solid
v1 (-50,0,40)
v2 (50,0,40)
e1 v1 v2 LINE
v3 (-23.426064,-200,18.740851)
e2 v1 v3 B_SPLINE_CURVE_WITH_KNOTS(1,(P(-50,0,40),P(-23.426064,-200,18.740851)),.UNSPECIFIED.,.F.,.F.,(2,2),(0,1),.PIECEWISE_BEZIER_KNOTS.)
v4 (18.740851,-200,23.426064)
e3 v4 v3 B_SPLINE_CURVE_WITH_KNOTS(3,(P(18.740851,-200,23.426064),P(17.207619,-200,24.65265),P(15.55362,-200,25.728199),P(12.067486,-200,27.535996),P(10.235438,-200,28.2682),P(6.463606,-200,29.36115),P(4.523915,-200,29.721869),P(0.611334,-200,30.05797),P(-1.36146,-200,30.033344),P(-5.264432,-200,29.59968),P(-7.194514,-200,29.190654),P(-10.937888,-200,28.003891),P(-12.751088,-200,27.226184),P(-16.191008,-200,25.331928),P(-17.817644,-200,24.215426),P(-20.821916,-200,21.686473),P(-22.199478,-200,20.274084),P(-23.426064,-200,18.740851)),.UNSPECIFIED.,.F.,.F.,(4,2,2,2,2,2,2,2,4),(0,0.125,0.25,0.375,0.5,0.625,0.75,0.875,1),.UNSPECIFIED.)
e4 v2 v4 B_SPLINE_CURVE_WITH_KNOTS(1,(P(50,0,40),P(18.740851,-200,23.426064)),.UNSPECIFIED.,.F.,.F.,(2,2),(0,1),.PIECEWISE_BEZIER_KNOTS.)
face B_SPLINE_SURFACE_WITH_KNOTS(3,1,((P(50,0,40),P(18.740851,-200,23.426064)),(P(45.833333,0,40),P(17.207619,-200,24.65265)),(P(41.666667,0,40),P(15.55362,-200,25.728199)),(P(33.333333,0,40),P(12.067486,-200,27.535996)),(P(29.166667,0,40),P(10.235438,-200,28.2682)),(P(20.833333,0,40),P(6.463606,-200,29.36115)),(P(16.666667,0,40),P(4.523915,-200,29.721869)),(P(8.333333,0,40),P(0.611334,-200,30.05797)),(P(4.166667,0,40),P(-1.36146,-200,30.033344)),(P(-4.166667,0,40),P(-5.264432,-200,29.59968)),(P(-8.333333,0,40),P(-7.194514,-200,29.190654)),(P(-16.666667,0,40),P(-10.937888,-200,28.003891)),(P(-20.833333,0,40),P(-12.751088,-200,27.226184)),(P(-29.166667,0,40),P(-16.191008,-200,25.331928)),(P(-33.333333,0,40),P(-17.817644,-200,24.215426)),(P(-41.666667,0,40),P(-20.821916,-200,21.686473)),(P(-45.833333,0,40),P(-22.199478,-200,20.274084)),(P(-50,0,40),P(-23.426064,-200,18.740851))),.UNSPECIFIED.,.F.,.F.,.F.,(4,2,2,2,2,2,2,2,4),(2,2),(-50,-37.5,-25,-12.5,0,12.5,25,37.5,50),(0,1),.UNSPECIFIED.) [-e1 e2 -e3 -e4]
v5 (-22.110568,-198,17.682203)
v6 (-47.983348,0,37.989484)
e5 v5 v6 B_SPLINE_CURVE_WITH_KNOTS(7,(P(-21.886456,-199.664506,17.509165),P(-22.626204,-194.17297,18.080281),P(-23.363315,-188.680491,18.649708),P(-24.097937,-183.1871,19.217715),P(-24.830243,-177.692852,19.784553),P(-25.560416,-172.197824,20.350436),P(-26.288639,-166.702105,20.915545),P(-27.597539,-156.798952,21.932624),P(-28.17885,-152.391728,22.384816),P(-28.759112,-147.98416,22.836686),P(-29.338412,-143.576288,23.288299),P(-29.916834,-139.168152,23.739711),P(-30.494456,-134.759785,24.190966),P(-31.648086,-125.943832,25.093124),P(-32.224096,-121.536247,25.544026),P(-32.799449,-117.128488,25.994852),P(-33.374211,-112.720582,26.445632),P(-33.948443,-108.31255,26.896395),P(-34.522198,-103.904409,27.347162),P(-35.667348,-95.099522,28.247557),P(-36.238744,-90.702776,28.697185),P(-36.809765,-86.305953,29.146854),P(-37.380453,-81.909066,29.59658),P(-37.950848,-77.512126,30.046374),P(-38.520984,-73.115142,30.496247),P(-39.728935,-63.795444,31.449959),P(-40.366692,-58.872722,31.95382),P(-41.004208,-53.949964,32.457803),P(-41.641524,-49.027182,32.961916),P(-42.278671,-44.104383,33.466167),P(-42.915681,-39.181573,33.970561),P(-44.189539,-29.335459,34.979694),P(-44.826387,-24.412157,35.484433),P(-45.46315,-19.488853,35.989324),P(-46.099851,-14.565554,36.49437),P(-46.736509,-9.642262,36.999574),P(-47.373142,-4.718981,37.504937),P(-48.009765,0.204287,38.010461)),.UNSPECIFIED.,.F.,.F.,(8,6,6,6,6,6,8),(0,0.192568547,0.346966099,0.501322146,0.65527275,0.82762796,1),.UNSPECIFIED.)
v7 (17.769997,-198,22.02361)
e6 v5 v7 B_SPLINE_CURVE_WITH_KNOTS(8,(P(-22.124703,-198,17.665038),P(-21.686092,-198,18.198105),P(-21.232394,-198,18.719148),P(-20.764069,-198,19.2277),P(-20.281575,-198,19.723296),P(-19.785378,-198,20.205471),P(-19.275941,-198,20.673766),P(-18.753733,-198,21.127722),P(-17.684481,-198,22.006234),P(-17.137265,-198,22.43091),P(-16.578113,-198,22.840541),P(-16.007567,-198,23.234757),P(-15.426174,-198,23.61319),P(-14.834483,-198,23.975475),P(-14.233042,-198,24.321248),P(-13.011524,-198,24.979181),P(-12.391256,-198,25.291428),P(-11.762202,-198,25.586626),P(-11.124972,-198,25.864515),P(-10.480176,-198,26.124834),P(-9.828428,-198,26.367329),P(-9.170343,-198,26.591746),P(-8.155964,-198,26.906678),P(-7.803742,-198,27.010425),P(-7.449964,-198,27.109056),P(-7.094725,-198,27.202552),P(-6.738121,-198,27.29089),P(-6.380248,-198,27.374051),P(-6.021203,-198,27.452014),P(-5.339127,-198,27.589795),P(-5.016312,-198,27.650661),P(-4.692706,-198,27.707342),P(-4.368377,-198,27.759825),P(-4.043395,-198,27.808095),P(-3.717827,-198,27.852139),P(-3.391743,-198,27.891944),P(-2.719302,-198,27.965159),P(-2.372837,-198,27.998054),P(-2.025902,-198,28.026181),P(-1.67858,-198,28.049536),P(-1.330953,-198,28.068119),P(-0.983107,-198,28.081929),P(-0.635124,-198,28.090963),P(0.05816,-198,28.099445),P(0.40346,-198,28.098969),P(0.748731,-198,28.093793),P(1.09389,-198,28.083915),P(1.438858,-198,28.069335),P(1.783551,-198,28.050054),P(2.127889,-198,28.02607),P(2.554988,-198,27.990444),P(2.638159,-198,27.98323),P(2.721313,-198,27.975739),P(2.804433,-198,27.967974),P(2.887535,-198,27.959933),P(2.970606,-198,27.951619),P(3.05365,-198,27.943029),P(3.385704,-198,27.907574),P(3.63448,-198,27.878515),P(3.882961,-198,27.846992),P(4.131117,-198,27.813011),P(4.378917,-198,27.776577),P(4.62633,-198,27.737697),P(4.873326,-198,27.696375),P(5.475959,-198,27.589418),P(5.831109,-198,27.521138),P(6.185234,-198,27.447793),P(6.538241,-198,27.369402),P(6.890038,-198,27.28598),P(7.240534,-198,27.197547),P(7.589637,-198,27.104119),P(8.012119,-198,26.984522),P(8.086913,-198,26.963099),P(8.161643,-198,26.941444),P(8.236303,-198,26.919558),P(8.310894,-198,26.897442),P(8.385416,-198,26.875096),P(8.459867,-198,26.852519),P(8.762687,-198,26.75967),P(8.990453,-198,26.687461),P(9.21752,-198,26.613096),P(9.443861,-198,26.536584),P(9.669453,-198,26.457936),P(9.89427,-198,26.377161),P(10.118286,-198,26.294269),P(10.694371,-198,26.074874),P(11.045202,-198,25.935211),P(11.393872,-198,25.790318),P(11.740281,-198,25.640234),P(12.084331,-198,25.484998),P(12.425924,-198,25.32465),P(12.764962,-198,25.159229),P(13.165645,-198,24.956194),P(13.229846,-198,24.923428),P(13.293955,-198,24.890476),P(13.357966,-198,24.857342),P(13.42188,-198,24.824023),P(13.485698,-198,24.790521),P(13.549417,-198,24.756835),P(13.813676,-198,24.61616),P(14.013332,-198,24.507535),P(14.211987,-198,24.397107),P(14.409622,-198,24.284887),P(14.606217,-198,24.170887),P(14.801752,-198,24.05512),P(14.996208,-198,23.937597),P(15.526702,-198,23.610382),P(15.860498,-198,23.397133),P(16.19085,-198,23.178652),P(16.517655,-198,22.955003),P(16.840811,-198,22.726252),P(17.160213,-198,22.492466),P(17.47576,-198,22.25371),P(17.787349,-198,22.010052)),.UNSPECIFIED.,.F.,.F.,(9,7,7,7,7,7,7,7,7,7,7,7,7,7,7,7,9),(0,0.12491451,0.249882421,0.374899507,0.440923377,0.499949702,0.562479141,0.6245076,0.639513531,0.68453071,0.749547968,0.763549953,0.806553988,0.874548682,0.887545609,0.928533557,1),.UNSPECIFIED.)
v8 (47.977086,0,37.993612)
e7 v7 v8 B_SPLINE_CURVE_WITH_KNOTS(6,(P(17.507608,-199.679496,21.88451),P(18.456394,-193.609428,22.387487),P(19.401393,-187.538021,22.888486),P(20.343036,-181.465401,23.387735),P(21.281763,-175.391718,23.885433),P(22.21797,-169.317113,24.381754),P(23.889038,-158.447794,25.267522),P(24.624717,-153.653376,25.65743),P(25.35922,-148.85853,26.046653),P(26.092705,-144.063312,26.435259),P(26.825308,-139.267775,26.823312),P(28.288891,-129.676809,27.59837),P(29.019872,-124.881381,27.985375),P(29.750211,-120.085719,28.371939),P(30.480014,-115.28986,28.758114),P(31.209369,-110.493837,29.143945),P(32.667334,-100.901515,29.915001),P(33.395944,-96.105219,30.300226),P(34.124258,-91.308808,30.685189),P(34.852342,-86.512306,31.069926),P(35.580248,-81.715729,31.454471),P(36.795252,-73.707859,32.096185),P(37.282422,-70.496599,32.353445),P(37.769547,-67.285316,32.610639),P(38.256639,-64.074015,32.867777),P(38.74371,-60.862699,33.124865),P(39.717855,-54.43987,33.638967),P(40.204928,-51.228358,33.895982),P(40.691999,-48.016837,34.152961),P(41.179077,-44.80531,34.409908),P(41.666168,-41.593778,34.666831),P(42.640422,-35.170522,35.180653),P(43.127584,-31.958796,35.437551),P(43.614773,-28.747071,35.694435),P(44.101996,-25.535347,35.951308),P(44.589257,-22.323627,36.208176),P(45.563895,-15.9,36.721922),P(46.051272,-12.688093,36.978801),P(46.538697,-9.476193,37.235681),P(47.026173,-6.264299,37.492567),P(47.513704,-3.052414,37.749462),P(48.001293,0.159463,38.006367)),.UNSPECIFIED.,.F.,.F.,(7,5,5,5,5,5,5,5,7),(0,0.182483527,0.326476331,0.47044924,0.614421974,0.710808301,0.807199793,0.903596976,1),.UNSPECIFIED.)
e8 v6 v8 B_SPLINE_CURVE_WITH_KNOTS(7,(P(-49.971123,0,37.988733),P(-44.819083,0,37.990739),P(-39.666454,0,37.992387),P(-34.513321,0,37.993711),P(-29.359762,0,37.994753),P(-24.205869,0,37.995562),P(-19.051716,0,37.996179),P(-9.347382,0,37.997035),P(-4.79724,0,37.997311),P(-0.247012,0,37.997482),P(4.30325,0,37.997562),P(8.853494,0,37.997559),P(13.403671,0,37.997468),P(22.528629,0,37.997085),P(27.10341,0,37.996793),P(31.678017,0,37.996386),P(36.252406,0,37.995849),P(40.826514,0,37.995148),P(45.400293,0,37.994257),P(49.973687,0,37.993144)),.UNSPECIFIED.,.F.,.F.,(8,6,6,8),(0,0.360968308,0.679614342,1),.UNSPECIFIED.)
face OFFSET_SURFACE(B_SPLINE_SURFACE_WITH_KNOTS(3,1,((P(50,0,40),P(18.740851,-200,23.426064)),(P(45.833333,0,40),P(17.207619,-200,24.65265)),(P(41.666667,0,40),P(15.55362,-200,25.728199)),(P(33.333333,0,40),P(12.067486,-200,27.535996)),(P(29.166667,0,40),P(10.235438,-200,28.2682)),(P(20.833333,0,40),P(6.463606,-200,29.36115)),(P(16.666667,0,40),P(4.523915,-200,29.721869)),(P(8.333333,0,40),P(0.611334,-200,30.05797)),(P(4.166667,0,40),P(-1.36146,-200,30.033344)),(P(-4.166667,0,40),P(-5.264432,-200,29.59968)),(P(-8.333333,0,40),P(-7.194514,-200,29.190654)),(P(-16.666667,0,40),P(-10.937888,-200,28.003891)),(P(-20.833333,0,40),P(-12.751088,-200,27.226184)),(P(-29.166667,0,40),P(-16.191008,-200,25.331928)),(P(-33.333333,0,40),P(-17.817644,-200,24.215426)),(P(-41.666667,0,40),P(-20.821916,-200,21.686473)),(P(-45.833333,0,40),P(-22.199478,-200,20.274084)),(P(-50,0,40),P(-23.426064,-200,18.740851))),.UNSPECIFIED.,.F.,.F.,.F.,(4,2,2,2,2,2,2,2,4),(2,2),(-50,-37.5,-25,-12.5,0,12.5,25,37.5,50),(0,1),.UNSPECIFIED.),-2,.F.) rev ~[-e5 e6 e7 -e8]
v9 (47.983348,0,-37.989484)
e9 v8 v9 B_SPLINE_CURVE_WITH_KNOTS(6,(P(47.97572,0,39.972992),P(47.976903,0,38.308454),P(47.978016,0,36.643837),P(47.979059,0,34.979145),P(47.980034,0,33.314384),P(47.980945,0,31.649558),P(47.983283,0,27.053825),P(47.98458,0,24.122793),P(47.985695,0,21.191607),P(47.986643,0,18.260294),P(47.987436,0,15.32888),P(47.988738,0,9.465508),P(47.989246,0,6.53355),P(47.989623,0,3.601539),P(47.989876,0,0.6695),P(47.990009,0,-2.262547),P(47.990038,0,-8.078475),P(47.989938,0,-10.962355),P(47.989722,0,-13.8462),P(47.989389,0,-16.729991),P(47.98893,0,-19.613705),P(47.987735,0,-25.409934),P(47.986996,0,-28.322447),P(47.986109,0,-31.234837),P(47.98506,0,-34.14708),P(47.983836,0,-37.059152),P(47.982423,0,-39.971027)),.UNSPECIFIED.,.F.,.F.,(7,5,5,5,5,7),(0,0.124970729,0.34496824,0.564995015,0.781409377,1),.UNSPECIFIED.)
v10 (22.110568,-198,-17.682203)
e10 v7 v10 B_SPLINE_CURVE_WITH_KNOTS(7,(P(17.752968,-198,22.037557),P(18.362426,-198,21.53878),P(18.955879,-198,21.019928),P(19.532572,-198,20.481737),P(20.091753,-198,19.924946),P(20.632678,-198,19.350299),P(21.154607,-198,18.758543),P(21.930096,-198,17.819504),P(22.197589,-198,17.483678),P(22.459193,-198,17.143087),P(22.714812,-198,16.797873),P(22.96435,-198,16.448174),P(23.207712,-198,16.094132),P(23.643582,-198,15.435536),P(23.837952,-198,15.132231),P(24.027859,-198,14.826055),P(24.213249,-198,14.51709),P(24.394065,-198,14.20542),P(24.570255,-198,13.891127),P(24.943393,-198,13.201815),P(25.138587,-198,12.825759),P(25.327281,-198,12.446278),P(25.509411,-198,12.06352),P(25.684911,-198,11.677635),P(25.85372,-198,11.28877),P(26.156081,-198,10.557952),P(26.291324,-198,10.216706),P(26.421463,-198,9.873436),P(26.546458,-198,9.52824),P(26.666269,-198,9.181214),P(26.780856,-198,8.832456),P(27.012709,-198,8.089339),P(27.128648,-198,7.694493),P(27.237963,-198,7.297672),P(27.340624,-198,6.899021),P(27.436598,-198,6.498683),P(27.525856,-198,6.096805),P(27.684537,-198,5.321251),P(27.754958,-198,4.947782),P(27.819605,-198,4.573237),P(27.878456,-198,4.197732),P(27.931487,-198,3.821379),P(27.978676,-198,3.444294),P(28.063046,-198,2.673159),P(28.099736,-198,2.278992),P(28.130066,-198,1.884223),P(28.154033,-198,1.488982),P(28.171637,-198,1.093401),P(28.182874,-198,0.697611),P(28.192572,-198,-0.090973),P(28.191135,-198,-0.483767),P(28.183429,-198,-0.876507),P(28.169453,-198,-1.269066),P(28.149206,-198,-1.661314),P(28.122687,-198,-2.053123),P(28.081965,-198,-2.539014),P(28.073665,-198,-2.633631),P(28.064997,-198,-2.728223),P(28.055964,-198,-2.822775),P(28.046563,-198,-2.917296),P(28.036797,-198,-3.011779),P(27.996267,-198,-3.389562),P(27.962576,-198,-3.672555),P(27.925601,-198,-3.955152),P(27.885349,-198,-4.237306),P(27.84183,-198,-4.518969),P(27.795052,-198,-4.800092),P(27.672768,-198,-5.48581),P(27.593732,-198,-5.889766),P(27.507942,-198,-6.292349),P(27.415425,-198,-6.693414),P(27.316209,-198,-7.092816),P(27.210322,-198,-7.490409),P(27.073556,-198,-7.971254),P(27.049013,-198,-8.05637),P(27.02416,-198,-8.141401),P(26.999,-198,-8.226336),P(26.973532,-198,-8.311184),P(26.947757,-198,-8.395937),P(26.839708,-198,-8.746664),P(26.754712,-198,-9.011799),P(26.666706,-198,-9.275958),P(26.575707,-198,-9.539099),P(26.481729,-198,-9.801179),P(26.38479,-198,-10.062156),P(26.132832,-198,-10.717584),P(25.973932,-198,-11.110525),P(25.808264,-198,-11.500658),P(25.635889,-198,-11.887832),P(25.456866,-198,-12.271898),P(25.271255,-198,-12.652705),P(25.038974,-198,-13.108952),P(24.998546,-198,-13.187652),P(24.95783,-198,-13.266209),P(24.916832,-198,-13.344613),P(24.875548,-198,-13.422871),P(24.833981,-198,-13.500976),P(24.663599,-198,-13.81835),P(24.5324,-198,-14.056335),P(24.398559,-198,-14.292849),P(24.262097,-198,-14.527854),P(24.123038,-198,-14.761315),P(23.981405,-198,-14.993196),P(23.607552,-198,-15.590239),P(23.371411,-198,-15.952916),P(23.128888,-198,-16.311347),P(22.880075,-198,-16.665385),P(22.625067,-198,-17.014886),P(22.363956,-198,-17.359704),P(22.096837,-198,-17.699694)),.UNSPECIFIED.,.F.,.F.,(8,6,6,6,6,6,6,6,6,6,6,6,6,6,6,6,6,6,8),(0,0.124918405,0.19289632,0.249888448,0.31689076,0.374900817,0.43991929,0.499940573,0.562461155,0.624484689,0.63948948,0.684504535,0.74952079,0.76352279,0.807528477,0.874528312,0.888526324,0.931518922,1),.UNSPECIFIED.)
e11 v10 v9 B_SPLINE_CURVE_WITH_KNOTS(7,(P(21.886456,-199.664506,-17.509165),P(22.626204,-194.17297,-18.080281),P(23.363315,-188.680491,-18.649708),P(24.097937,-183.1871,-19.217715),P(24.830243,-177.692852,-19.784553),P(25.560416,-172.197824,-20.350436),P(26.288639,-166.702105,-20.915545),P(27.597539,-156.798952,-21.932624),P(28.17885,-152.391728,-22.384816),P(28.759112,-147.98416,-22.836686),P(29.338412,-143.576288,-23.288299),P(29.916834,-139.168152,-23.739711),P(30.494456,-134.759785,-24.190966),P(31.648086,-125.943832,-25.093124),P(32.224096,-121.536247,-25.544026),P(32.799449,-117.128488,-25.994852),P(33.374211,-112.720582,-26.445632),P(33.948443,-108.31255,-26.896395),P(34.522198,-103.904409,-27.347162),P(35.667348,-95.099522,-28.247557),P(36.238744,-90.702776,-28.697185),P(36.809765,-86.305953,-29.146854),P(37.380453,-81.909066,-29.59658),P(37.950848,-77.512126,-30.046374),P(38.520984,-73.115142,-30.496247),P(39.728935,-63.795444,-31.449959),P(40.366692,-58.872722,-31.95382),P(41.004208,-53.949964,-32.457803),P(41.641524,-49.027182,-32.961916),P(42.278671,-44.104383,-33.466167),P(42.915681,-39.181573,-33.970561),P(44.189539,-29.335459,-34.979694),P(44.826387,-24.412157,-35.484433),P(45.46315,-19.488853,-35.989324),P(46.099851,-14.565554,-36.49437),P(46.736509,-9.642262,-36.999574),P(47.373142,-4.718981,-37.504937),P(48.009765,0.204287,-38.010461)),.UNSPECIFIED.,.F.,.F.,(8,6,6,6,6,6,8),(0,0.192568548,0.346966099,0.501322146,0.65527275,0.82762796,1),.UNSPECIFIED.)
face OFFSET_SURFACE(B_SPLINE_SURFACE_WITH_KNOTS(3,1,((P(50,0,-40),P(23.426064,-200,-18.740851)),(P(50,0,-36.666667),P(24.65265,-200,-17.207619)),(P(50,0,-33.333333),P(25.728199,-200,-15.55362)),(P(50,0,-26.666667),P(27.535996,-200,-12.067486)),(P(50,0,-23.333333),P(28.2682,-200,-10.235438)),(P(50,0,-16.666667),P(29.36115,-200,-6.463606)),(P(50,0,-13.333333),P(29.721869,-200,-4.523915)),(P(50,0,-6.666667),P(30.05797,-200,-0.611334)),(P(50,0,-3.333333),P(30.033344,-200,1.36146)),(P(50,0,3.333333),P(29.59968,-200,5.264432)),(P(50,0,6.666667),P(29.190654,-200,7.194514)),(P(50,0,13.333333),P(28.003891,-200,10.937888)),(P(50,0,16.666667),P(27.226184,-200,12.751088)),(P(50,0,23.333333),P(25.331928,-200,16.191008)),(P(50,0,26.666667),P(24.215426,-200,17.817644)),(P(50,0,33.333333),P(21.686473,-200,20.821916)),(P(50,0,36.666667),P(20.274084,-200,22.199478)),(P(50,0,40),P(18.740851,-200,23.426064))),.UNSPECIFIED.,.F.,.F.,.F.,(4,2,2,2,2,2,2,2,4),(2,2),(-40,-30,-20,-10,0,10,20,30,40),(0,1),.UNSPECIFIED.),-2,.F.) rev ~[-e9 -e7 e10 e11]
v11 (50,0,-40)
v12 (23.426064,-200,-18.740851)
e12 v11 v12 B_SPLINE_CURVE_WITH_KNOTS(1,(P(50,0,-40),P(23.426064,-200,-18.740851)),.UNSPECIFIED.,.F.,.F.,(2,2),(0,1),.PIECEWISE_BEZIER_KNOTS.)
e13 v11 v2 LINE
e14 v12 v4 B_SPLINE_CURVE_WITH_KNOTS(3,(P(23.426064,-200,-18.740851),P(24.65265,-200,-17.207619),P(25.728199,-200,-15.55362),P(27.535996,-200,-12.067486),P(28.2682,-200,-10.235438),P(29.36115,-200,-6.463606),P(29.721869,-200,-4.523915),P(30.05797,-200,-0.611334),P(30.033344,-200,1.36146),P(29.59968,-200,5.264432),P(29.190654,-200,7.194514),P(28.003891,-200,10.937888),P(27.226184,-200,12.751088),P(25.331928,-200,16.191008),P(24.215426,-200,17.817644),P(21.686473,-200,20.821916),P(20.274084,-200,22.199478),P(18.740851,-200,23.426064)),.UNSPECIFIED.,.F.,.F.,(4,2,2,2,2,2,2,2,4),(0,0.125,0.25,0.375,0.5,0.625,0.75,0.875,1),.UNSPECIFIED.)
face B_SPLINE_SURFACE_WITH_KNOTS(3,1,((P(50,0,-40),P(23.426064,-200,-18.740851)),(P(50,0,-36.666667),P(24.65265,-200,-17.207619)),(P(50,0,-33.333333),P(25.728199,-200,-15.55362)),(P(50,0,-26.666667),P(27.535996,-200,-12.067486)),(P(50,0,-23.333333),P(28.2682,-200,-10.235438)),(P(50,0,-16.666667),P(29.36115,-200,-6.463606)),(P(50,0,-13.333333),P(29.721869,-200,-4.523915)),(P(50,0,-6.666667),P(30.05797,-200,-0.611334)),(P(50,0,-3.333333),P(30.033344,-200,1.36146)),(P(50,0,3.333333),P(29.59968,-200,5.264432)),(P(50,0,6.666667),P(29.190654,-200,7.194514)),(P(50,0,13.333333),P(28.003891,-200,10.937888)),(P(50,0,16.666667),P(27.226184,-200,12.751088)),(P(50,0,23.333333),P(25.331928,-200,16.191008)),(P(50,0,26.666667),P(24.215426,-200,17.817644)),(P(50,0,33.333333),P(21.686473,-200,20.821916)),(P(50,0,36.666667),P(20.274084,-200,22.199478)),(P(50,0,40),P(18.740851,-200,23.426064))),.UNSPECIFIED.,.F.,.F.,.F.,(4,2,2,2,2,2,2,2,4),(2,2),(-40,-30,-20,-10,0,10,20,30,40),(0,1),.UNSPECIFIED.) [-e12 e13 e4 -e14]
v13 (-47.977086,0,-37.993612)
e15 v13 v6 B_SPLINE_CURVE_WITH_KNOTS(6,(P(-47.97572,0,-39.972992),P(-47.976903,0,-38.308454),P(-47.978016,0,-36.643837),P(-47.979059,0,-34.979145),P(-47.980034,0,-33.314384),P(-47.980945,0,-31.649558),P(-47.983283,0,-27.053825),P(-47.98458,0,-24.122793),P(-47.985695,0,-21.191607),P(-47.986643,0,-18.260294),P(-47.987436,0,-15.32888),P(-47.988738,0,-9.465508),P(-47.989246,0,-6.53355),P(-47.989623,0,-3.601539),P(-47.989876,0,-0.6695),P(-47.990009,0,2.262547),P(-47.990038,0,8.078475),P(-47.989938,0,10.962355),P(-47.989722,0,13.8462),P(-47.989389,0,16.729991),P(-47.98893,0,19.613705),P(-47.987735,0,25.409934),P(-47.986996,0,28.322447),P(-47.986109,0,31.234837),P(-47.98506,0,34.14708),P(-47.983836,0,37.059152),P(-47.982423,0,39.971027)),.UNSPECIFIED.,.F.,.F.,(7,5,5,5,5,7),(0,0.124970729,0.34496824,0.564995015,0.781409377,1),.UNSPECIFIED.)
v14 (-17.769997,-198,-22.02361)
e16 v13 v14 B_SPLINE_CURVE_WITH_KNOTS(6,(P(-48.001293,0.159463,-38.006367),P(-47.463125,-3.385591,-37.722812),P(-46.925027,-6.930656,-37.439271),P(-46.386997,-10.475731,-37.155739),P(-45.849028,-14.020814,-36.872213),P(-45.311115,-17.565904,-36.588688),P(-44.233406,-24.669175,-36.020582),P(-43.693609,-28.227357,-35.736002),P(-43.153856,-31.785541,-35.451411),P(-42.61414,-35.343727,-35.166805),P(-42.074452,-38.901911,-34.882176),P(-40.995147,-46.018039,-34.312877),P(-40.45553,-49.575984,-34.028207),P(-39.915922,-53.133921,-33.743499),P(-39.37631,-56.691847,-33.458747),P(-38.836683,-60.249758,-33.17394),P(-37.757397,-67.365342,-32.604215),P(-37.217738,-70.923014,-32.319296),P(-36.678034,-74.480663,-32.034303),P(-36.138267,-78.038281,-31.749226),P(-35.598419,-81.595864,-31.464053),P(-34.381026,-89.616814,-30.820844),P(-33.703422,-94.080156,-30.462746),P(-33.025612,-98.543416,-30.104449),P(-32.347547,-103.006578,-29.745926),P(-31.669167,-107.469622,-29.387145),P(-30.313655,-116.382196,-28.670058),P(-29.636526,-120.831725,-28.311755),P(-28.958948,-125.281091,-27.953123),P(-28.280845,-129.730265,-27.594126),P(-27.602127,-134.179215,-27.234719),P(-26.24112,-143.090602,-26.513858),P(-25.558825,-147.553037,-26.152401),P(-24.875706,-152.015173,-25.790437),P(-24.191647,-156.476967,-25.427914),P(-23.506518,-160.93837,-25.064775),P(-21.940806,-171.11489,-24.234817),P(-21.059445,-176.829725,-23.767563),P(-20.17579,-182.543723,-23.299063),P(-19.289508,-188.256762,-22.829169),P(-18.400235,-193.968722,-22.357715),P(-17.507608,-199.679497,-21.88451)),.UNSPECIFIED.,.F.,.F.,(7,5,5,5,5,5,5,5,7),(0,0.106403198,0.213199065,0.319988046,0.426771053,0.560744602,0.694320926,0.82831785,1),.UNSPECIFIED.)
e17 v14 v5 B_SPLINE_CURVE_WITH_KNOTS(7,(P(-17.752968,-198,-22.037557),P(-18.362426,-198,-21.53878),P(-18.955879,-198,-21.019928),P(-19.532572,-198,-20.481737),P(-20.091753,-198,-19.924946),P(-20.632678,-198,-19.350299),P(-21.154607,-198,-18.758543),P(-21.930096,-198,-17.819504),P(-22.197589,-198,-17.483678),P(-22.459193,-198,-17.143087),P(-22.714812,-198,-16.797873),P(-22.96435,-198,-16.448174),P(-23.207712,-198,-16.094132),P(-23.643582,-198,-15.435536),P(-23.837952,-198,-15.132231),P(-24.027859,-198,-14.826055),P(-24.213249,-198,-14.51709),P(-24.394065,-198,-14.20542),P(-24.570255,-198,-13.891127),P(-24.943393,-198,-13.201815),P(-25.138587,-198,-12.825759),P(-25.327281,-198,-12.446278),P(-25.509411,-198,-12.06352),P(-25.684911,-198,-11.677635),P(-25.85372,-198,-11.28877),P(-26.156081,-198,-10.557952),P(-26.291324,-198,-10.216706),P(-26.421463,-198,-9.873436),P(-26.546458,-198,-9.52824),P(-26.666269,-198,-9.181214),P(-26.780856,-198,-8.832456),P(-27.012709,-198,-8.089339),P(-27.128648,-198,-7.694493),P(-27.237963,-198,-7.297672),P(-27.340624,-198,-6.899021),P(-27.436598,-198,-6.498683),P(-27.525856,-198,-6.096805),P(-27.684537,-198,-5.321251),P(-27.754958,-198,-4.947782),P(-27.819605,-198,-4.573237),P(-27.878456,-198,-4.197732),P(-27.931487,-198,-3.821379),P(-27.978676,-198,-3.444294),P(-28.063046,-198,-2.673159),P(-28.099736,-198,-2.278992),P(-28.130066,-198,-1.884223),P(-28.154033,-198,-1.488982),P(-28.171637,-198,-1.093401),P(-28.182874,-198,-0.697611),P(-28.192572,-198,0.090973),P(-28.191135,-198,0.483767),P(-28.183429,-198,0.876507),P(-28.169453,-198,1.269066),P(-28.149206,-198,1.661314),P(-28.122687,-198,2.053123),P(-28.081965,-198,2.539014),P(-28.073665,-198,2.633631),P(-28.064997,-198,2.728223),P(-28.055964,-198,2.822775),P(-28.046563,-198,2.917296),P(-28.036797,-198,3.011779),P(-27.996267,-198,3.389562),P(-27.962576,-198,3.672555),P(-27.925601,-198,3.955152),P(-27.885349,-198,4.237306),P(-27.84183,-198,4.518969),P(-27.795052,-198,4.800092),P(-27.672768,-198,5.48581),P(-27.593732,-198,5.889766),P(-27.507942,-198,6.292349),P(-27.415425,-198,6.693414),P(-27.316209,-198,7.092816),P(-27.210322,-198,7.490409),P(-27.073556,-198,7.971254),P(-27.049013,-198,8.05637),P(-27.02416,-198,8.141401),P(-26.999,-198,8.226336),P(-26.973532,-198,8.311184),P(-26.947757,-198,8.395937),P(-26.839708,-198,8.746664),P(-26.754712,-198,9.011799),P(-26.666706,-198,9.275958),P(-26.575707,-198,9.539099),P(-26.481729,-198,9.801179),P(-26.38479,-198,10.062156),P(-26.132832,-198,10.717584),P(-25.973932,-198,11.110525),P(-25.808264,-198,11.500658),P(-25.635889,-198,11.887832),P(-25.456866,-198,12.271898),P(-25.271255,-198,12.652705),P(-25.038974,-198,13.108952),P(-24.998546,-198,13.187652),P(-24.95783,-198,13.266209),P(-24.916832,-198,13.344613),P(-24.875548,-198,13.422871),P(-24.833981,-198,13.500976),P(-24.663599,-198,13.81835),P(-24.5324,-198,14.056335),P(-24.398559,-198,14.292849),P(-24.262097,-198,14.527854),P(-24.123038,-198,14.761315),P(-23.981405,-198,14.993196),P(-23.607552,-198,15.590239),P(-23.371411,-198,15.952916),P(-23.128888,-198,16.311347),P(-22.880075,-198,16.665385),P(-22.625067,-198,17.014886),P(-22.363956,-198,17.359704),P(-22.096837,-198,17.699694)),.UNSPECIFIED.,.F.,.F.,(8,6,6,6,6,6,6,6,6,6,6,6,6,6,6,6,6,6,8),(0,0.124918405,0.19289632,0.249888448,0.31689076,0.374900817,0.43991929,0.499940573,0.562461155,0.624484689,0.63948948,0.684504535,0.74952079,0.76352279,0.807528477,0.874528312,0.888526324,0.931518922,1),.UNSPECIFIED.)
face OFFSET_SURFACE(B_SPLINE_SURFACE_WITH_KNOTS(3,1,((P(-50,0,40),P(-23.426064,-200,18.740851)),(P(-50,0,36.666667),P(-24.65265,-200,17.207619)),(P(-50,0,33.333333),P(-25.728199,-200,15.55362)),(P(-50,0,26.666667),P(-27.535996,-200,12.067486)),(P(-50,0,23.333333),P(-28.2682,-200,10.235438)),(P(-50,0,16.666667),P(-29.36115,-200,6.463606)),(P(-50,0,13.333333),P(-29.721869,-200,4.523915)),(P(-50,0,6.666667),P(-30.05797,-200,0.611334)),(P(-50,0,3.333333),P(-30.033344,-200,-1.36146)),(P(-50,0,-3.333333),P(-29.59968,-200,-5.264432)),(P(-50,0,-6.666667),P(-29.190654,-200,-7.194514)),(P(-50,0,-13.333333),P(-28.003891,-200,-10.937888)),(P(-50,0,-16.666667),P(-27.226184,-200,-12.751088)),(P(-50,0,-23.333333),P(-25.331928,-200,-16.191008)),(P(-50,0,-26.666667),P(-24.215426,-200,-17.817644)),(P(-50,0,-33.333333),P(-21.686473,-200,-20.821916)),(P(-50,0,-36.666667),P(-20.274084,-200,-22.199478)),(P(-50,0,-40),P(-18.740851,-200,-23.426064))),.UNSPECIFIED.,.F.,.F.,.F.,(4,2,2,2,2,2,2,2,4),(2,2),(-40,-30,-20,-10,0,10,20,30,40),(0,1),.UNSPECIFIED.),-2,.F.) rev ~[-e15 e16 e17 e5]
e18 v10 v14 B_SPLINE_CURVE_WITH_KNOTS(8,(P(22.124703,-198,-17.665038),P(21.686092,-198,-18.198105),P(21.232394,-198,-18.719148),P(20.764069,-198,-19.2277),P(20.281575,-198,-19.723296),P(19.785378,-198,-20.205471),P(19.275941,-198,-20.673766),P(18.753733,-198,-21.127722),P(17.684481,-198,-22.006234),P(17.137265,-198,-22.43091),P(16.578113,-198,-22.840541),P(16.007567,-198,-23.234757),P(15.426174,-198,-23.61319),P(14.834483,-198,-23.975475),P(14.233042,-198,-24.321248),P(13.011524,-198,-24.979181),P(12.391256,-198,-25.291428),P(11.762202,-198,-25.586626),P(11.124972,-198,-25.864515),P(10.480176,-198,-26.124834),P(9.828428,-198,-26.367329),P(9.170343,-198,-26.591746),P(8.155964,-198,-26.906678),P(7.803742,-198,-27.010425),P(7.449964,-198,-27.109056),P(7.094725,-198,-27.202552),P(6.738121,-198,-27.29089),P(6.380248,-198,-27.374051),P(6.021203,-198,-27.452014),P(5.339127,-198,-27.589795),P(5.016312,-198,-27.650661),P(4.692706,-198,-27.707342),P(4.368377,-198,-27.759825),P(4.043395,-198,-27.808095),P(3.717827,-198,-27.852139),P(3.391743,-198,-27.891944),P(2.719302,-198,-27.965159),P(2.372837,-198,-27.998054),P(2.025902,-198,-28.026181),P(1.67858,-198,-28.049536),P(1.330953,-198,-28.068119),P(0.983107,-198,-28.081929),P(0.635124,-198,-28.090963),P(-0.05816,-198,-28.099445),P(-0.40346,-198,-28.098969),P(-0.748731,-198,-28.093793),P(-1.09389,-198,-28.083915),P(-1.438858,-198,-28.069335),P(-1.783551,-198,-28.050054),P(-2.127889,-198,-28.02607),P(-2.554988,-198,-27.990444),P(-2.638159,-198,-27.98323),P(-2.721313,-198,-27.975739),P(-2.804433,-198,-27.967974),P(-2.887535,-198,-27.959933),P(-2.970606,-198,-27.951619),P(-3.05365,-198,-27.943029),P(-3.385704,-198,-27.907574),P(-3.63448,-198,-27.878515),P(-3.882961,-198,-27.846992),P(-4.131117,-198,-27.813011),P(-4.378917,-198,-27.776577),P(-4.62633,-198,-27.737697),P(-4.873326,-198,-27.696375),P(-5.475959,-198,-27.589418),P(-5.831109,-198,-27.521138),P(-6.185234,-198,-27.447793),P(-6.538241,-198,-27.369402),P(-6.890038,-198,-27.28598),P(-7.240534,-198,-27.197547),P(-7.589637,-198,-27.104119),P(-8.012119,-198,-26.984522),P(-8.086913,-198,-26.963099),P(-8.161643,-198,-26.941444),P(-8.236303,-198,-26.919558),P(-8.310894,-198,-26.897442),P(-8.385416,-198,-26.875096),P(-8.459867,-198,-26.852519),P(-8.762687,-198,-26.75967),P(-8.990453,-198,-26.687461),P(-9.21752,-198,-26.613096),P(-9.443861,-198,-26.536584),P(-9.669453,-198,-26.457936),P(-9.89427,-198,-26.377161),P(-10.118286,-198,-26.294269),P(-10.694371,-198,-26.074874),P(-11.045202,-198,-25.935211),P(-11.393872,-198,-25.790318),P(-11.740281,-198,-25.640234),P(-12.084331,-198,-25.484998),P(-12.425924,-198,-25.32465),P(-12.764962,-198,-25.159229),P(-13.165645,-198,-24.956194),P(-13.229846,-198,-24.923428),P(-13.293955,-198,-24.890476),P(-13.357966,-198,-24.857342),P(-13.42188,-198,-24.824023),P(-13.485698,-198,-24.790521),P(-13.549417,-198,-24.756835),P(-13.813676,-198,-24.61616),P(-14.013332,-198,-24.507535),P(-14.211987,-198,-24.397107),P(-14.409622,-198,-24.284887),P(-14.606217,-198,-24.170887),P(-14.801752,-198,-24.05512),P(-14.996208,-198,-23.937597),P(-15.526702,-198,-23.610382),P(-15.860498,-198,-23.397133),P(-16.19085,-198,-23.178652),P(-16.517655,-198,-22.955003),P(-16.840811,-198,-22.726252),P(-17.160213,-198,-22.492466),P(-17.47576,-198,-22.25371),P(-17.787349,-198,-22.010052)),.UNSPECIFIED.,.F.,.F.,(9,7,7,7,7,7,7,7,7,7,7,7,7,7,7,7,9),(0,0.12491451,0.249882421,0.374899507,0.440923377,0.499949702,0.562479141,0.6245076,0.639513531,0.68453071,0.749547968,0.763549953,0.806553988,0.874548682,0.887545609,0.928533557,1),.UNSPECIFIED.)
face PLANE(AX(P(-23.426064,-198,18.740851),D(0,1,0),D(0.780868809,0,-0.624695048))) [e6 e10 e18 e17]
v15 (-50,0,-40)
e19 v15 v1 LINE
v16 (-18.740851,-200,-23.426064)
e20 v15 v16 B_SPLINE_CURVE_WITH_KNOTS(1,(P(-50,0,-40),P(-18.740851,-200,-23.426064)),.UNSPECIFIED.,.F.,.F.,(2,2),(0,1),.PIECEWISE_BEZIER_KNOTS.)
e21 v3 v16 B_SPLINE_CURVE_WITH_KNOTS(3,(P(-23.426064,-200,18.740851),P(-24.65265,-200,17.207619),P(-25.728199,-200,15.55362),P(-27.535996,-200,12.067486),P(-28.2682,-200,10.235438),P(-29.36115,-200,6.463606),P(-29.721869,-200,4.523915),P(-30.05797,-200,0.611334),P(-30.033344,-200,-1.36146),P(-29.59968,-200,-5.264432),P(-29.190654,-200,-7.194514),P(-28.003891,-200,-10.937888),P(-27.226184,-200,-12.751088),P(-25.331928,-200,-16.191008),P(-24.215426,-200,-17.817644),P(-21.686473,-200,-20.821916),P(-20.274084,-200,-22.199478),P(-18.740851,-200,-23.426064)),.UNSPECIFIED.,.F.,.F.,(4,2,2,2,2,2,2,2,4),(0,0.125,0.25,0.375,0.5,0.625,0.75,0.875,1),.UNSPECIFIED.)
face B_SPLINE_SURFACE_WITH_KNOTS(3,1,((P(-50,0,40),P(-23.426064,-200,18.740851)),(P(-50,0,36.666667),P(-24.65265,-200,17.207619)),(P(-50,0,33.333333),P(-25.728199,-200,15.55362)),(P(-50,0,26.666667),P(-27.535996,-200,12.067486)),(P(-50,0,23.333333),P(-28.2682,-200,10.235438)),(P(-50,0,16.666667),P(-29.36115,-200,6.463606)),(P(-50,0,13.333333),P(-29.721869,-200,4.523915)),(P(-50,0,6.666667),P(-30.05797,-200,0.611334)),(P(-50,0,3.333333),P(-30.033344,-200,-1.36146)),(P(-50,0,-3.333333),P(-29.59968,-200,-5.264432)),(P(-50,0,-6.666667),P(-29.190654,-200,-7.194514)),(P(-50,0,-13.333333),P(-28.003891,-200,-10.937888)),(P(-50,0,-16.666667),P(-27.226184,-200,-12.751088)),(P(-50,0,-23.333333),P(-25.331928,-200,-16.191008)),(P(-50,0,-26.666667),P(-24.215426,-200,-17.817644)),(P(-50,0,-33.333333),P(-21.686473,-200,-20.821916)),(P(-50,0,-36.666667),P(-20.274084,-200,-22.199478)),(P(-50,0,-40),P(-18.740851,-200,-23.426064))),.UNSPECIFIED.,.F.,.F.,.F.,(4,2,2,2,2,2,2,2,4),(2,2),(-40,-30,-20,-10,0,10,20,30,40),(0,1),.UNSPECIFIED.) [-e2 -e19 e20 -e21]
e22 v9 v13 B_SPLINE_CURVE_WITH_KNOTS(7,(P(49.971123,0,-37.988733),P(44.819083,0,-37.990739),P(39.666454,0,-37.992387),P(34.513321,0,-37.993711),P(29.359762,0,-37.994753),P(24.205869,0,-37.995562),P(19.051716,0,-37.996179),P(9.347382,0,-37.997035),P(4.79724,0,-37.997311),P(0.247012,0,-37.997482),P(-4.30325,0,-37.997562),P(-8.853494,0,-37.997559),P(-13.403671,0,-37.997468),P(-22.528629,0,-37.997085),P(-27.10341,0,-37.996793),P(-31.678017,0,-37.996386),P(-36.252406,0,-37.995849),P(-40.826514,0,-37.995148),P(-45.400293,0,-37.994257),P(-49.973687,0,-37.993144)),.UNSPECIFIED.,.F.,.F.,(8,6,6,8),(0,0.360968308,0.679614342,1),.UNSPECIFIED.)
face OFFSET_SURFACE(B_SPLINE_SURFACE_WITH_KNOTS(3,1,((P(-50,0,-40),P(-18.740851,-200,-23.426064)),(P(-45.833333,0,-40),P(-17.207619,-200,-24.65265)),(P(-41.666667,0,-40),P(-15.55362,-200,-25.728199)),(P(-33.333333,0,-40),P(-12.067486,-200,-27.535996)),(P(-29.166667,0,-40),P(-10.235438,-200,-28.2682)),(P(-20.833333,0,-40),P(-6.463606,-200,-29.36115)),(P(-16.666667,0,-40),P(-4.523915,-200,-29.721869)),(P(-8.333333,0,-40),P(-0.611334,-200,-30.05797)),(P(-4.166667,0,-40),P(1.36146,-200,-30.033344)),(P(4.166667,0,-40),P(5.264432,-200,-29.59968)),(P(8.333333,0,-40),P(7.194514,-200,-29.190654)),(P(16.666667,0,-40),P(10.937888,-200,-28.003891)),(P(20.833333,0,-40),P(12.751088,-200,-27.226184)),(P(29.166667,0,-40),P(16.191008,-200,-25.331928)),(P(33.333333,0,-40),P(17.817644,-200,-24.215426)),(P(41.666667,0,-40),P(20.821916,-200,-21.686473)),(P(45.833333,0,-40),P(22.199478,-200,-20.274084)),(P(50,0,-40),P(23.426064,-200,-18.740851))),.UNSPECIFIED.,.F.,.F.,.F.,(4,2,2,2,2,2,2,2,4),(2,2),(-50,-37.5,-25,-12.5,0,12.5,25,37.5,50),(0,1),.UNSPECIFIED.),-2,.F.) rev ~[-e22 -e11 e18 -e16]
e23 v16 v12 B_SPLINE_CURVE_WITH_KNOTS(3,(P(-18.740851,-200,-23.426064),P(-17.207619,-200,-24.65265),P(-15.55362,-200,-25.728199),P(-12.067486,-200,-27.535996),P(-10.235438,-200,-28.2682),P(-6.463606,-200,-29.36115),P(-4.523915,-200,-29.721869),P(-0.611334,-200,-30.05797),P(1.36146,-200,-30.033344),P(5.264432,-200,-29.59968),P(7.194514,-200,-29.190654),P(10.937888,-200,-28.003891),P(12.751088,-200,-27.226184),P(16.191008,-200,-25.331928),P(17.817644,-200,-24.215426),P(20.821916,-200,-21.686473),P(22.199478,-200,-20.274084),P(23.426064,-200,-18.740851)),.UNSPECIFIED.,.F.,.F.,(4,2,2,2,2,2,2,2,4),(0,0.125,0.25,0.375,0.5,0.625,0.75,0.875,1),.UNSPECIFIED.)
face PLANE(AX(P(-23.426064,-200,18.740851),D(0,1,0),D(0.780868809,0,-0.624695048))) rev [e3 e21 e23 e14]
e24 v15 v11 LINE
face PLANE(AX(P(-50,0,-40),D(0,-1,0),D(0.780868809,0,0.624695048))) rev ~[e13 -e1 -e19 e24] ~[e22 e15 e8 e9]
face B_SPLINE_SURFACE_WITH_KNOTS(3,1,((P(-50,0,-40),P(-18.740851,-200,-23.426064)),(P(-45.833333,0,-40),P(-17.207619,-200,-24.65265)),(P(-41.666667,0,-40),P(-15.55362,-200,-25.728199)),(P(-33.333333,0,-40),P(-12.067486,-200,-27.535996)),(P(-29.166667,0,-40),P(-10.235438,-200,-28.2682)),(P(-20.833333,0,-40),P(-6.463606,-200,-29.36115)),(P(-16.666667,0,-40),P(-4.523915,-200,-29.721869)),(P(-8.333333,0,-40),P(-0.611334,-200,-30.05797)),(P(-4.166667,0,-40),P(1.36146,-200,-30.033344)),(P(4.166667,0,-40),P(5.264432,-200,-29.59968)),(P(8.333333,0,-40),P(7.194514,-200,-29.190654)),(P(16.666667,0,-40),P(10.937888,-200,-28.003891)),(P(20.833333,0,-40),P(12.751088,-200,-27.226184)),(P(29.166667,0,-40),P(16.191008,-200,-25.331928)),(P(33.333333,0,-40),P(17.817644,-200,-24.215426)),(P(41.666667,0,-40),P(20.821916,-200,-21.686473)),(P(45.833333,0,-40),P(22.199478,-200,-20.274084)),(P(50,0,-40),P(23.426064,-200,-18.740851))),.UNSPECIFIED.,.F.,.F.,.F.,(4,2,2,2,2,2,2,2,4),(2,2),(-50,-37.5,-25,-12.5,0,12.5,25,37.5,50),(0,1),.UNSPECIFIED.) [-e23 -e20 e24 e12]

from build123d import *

# Parameters (mm, degrees)
F0_W = 100
F0_H = 80
F4_T = 2


# Not quite as in the source:
# - the arcs of a loft's sections are written as splines that run evenly, so that the points pair up as in the source's solid
# - a shell that OpenCascade refuses in one call is made with other operations: the cavity is built on its own and cut out


with BuildPart() as f3:
    # F0 (on Front) → F3 section 0
    with BuildSketch(Plane.XZ):
        Rectangle(F0_W, F0_H)
    # F2 (on offset) → F3 section 1
    with BuildSketch(Plane.XZ.offset(200)):
        with BuildLine():
            add(Edge.make_bspline(
                [(23.4260642833, -18.7408514266), (24.6526501409, -17.2076191047), (25.7281991997, -15.5536195196), (27.5359963334, -12.0674860741), (28.2681997069, -10.2354384151), (29.3611496291, -6.4636063212), (29.7218691524, -4.5239151524), (30.0579704105, -0.6113338023), (30.0333438346, 1.3614596326), (29.5996802458, 5.2644319319), (29.1906539561, 7.1945142875), (28.0038909689, 10.9378884992), (27.2261836164, 12.751087793), (25.3319278668, 16.1910081455), (24.215426309, 17.8176441455), (21.6864729832, 20.8219164288), (20.2740837486, 22.1994784257), (18.7408514266, 23.4260642833)],
                knots=[0, 0, 0, 0, 0.125, 0.125, 0.25, 0.25, 0.375, 0.375, 0.5, 0.5, 0.625, 0.625, 0.75, 0.75, 0.875, 0.875, 1, 1, 1, 1], degree=3))
            add(Edge.make_bspline(
                [(18.7408514266, 23.4260642833), (17.2076191047, 24.6526501409), (15.5536195196, 25.7281991997), (12.0674860741, 27.5359963334), (10.2354384151, 28.2681997069), (6.4636063212, 29.3611496291), (4.5239151524, 29.7218691524), (0.6113338023, 30.0579704105), (-1.3614596326, 30.0333438346), (-5.2644319319, 29.5996802458), (-7.1945142875, 29.1906539561), (-10.9378884992, 28.0038909689), (-12.751087793, 27.2261836164), (-16.1910081455, 25.3319278668), (-17.8176441455, 24.215426309), (-20.8219164288, 21.6864729832), (-22.1994784257, 20.2740837486), (-23.4260642833, 18.7408514266)],
                knots=[0, 0, 0, 0, 0.125, 0.125, 0.25, 0.25, 0.375, 0.375, 0.5, 0.5, 0.625, 0.625, 0.75, 0.75, 0.875, 0.875, 1, 1, 1, 1], degree=3))
            add(Edge.make_bspline(
                [(-23.4260642833, 18.7408514266), (-24.6526501409, 17.2076191047), (-25.7281991997, 15.5536195196), (-27.5359963334, 12.0674860741), (-28.2681997069, 10.2354384151), (-29.3611496291, 6.4636063212), (-29.7218691524, 4.5239151524), (-30.0579704105, 0.6113338023), (-30.0333438346, -1.3614596326), (-29.5996802458, -5.2644319319), (-29.1906539561, -7.1945142875), (-28.0038909689, -10.9378884992), (-27.2261836164, -12.751087793), (-25.3319278668, -16.1910081455), (-24.215426309, -17.8176441455), (-21.6864729832, -20.8219164288), (-20.2740837486, -22.1994784257), (-18.7408514266, -23.4260642833)],
                knots=[0, 0, 0, 0, 0.125, 0.125, 0.25, 0.25, 0.375, 0.375, 0.5, 0.5, 0.625, 0.625, 0.75, 0.75, 0.875, 0.875, 1, 1, 1, 1], degree=3))
            add(Edge.make_bspline(
                [(-18.7408514266, -23.4260642833), (-17.2076191047, -24.6526501409), (-15.5536195196, -25.7281991997), (-12.0674860741, -27.5359963334), (-10.2354384151, -28.2681997069), (-6.4636063212, -29.3611496291), (-4.5239151524, -29.7218691524), (-0.6113338023, -30.0579704105), (1.3614596326, -30.0333438346), (5.2644319319, -29.5996802458), (7.1945142875, -29.1906539561), (10.9378884992, -28.0038909689), (12.751087793, -27.2261836164), (16.1910081455, -25.3319278668), (17.8176441455, -24.215426309), (20.8219164288, -21.6864729832), (22.1994784257, -20.2740837486), (23.4260642833, -18.7408514266)],
                knots=[0, 0, 0, 0, 0.125, 0.125, 0.25, 0.25, 0.375, 0.375, 0.5, 0.5, 0.625, 0.625, 0.75, 0.75, 0.875, 0.875, 1, 1, 1, 1], degree=3))
        make_face()
    loft(ruled=True)

    # F4: shell of thickness 2, made by hand


with BuildPart() as f4_core1:
    # F4_t2: copy of F3
    add(f3.part)

    # the walls: a layer under each face that stays
    f4_faces = [f4_core1.faces().sort_by_distance(p)[0] for p in [
        (1.6564728911, -100, -34.9082560201),
        (39.9082560201, -100, 1.6564728911),
        (-1.6564728911, -100, 34.9082560201),
        (-39.9082560201, -100, -1.6564728911),
        (0, -200, 0),
    ]]
    thicken(f4_faces, amount=-F4_T, mode=Mode.SUBTRACT)


with BuildPart() as f3_1:
    add(f3.part)

    # what is left inside the walls is the cavity
    f4_cavity = [f4_core1.part.solids().sort_by_distance(p)[0] for p in [
        (-1.053831, -66.075437, 34.613436),
    ]]
    add(f4_cavity, mode=Mode.SUBTRACT)


solid = f3_1.part
